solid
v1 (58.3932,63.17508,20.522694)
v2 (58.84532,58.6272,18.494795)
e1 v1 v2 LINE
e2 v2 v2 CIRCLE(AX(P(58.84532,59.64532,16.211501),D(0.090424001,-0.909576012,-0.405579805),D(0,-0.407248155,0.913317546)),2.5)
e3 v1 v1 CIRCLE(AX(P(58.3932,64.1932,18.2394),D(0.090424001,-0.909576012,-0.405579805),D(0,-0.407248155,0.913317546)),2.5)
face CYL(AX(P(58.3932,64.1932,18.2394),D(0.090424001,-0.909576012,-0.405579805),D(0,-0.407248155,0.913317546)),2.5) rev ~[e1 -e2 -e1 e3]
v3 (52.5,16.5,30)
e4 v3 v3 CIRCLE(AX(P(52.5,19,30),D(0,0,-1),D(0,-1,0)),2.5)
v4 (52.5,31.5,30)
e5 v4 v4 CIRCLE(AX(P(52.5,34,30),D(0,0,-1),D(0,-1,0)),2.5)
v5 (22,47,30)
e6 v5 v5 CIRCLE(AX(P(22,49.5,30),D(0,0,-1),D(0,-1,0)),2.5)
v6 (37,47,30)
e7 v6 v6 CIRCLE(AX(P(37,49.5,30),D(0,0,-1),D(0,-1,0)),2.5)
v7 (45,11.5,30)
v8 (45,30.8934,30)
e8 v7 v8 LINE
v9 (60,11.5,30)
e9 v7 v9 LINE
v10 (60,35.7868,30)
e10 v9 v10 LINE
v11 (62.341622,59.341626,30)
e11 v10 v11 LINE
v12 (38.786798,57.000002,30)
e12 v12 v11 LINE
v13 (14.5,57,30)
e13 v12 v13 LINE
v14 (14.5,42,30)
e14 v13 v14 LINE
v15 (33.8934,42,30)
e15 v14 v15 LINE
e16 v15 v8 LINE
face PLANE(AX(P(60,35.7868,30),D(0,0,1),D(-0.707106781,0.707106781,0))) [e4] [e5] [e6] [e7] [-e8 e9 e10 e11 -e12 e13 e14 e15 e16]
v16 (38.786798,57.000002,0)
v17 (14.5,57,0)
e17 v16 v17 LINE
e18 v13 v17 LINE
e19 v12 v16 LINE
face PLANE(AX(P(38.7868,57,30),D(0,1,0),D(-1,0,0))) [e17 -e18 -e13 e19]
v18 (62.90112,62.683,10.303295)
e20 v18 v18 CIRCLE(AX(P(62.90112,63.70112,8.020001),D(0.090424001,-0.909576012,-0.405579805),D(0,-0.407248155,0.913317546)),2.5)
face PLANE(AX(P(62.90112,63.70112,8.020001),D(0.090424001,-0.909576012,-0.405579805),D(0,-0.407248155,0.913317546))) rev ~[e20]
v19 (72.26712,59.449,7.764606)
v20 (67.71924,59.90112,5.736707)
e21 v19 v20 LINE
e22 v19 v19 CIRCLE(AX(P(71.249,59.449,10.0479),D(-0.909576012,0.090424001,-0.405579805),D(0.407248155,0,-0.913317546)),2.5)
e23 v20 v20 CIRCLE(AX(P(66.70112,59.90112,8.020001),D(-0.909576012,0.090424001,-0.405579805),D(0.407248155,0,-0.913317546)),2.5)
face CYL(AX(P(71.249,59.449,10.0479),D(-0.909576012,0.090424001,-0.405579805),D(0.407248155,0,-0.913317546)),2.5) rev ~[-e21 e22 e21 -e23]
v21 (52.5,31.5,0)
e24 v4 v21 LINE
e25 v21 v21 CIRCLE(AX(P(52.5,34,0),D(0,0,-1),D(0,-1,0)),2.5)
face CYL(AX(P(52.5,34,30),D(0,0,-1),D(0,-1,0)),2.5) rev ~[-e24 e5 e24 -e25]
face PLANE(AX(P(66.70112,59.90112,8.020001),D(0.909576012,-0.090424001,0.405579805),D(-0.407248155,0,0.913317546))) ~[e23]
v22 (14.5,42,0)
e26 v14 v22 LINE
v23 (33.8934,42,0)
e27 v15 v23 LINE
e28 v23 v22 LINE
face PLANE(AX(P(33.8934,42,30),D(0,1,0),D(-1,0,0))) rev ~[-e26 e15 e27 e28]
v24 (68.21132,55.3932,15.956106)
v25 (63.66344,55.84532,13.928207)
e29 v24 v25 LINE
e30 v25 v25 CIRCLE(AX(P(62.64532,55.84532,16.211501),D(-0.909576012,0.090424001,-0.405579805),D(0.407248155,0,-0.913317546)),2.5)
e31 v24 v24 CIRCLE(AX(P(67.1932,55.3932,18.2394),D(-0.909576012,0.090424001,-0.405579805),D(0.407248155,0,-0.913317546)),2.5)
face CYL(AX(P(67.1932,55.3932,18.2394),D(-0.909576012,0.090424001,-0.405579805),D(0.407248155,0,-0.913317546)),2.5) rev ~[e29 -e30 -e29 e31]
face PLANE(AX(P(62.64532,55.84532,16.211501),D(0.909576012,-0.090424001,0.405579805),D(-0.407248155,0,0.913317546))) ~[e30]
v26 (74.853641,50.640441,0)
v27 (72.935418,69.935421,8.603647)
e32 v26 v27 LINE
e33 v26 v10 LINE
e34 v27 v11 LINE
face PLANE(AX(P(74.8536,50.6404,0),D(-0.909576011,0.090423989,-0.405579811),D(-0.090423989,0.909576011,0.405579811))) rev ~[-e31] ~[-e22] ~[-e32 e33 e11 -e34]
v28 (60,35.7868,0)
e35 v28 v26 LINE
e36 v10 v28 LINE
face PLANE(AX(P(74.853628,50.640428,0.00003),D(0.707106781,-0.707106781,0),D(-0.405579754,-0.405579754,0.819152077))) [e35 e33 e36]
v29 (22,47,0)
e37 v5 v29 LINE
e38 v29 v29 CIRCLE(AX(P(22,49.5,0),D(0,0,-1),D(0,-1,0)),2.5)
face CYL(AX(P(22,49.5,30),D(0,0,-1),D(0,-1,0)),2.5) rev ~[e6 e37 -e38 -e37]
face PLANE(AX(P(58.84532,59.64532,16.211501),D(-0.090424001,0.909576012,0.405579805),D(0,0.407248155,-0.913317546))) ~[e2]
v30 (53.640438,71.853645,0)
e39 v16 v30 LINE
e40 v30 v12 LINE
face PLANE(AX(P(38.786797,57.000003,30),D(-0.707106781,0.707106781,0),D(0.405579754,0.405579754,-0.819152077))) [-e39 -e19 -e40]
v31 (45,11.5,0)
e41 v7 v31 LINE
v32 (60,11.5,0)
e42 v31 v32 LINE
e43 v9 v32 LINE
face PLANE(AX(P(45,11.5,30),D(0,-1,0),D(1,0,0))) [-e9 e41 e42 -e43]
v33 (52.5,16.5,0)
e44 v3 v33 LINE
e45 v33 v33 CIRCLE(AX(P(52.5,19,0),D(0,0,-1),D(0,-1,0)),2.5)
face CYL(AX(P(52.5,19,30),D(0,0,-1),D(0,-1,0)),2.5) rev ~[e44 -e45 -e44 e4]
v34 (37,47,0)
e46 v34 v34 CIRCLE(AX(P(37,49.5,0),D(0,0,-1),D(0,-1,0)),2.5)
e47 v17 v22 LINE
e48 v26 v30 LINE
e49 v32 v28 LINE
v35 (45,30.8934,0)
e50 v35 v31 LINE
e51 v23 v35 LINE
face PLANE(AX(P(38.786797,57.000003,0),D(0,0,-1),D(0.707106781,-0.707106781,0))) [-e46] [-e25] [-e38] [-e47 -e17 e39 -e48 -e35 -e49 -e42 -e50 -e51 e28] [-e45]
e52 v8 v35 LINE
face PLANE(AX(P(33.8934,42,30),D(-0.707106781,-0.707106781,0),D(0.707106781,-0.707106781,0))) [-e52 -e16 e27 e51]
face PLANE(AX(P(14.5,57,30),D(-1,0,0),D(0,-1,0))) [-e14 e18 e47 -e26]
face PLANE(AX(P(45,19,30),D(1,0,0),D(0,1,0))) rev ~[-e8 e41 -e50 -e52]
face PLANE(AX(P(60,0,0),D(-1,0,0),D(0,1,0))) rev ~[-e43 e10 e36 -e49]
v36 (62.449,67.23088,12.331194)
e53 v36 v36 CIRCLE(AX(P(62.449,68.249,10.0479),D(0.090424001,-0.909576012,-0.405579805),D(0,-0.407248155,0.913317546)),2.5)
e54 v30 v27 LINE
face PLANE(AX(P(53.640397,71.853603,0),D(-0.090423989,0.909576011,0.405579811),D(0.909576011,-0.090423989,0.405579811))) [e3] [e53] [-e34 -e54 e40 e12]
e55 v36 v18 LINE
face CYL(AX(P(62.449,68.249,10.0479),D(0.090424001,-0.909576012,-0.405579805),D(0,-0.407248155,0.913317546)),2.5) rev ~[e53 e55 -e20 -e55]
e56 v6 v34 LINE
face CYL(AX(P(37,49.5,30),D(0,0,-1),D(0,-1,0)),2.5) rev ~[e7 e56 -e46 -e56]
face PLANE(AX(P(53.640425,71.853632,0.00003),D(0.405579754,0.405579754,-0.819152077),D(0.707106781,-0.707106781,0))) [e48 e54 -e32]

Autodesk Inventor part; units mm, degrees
ref_plane "YZ Plane" through (0, 0, 0) normal (1, 0, 0) x (0, 1, 0)
ref_plane "XZ Plane" through (0, 0, 0) normal (0, 1, 0) x (-1, 0, 0)
ref_plane "XY Plane" through (0, 0, 0) normal (0, 0, 1) x (1, 0, 0)
sketch "スケッチ1" plane through (0, 0, 0) normal (0, 0, 1) x (1, 0, 0)
  line L0 (0, 0) -> (60, 0)
  line L1 (60, 0) -> (60, 60)
  line L2 (60, 60) -> (0, 60)
  line L3 (0, 60) -> (0, 0)
  dimension "d0" = 60
  dimension "d1" = 60
extrude "押し出し1" add sketch "スケッチ1" along normal blind 30
sketch "スケッチ2" plane through (0, 0, 30) normal (0, 0, 1) x (1, 0, 0)
  line L0 (60, 0) -> (60, 60) projected
  line L1 (60, 60) -> (0, 60) projected
  point P0 (0, 0)
  point P1 (22, 49.5)
  point P2 (37, 49.5)
  point P3 (52.5, 34)
  point P4 (52.5, 19)
  dimension "d4" = 7.5
  dimension "d5" = 7.5
  dimension "d6" = 10.5
  dimension "d7" = 10.5
  dimension "d8" = 15
  dimension "d9" = 15
  dimension "d10" = 23
  dimension "d11" = 26
hole "穴1" at (22, 49.5, 30) at (37, 49.5, 30) at (52.5, 34, 30) at (52.5, 19, 30) direction (0, 0, -1) diameter 5 end through all
sketch "スケッチ3" plane through (0, 0, 30) normal (0, 0, 1) x (1, 0, 0)
  line L0 (22, 49.5) -> (37, 49.5)
  circle A0 centre (52.5, 34) radius 2.5 projected
  line L1 (37, 49.5) -> (52.5, 34)
  line L2 (52.5, 34) -> (52.5, 19)
  line L3 (22, 49.5) -> (22, 19)
  line L4 (22, 19) -> (52.5, 19)
  line L5 (60, 37.1066) -> (40.1066, 57)
  line L6 (40.1066, 57) -> (14.5, 57)
  line L7 (14.5, 57) -> (14.5, 11.5)
  line L8 (14.5, 11.5) -> (60, 11.5)
  line L9 (60, 11.5) -> (60, 37.1066)
  line L10 (14.5, 57) -> (44.5, 57)
  line L11 (44.5, 57) -> (44.5, 42)
  line L12 (44.5, 42) -> (14.5, 42)
  line L13 (14.5, 42) -> (14.5, 57)
  line L14 (60, 11.5) -> (45, 11.5)
  line L15 (45, 11.5) -> (45, 41.5)
  line L16 (45, 41.5) -> (60, 41.5)
  line L17 (60, 41.5) -> (60, 11.5)
  circle A1 centre (52.5, 19) radius 2.5 projected
  circle A2 centre (52.5, 34) radius 2.5 projected
  circle A3 centre (37, 49.5) radius 2.5 projected
  circle A4 centre (22, 49.5) radius 2.5 projected
  line L18 (60, 0) -> (60, 60) projected
  line L19 (60, 60) -> (0, 60) projected
  line L20 (0, 60) -> (0, 0) projected
  line L21 (0, 0) -> (60, 0) projected
  line L22 (14.5, 42) -> (45, 11.5)
  line L23 (24.0029, 51.8905) -> (54.5029, 21.3905)
  line L24 (38.7868, 57) -> (60, 35.7868)
  point P0 (52.5, 26.5)
  point P1 (45, 19)
  point P2 (22, 42)
  point P3 (39.2529, 36.6405)
  point P4 (45, 30.8934)
  point P5 (33.8934, 42)
  dimension "d19" = 7.5
  dimension "d20" = 7.5
  dimension "d21" = 7.5
  dimension "d22" = 30
  dimension "d23" = 30
  dimension "d50" = 7.5
  dimension "d52" = 30
extrude "押し出し2" cut sketch "スケッチ3" against normal blind 30 contours L12 L23 L15 L4 L22 L3 | L3 L22 L12 | L22 L4 L3 | L3 L4 L22 L8 L7 | L7 L8 L18 L21 L20 L19 L16 L5 L11 L10 L6 | L4 L15 L22 | L24 L6 L5 L11 | L11 L5 L16 L24 | L16 L5 L9 L24 | L5 L10 L11 | L16 L17 L5
sketch "スケッチ15" plane through (60, 35.7868, 0) normal (0.7071068, 0.7071068, 0) x (-0.7071068, 0.7071068, 0)
  line L0 (0, 30) -> (30, 30) projected
  line L1 (0, 0) -> (0, 30) projected
  line L2 (30, 0) -> (0, 0) projected
  line L3 (30, 30) -> (30, 0) projected
  point P0 (17.1213, 0)
extrude "押し出し11" add sketch "スケッチ15" along normal blind 30
sketch "スケッチ16" plane through (60, 35.7868, 30) normal (0.7071068, -0.7071068, 0) x (-0.7071068, -0.7071068, 0)
  line L0 (0, 30) -> (0, 0) projected
  line L1 (0, 30) -> (-30, 30) projected
  line L2 (-30, 0) -> (-30, 30) projected
  line L3 (0, 0) -> (-30, 0) projected
  line L4 (0, 0) -> (-30.762, 43.9327)
  point P0 (67.7315, 30)
  point P1 (-21.0062, 30)
  dimension "d97" = 55
extrude "押し出し12" cut sketch "スケッチ16" against normal blind 30 contours L3 L2 L1 L4
sketch "スケッチ25" plane through (60, 35.7868, 30) normal (0.579228, 0.579228, 0.5735764) x (0.7071068, -0.7071068, 0)
  line L0 (0, 36.6232) -> (0, 0) projected
  line L1 (-30, 36.6232) -> (0, 36.6232) projected
  line L2 (-30, 0) -> (-30, 36.6232) projected
  line L3 (0, 0) -> (-30, 0) projected
  point P0 (-17.1213, -14.2746)
extrude "押し出し17" add sketch "スケッチ25" along normal blind 30
sketch "スケッチ26" plane through (74.8536, 50.6404, 0) normal (0.4055798, 0.4055798, -0.819152) x (-0.579228, -0.579228, -0.5735764)
  line L0 (0, 30) -> (0, 0) projected
  line L1 (0, 30) -> (-30, 30) projected
  line L2 (-30, 0) -> (-30, 30) projected
  line L3 (0, 0) -> (-30, 0) projected
  line L4 (0, 0) -> (-30, 30)
  line L5 (0, 30) -> (-30, 0)
  point P0 (72.6897, 17.1213)
  point P1 (-15, 15)
extrude "押し出し18" cut sketch "スケッチ26" against normal through all contours L5 L4 L1 | L3 L5 L4 | L4 L5 L2
sketch "スケッチ27" plane through (74.8536, 50.6404, 0) normal (0.909576, -0.090424, 0.4055798) x (0.4055798, 0.4055798, -0.819152)
  point P0 (-50.8979, -39.2928)
sketch "スケッチ28" plane through (0, 0, 30) normal (0, 0, 1) x (1, 0, 0)
  line L0 (3.3303, 1.5204) -> (87.3121, 1.5204)
  line L1 (87.3121, 1.5204) -> (87.3121, 89.4116)
  line L2 (87.3121, 89.4116) -> (3.3303, 89.4116)
  line L3 (3.3303, 89.4116) -> (3.3303, 1.5204)
  point P0 (0, 0)
extrude "押し出し19" cut sketch "スケッチ28" along normal blind 100
sketch "スケッチ29" plane through (74.8536, 50.6404, 0) normal (0.909576, -0.090424, 0.4055798) x (0.4055798, 0.4055798, -0.819152)
  line L0 (-36.6232, 21.2132) -> (-26.1201, 21.2132) projected
  line L1 (0, 21.2132) -> (0, 0) projected
  line L2 (-26.1201, 21.2132) -> (0, 21.2132)
  line L3 (0, 21.2132) -> (0, 0)
  line L4 (0, 0) -> (-26.1201, 0)
  line L5 (-26.1201, 0) -> (-26.1201, 21.2132)
  point P0 (-50.8979, -39.2928)
  point P1 (-16.1201, 12.4132)
  point P2 (-6.1201, 12.4132)
  dimension "d104" = 10
  dimension "d105" = 10
  dimension "d106" = 8.8
  dimension "d107" = 8.8
hole "穴4" at (67.1932, 55.3932, 18.2394) at (71.249, 59.449, 10.0479) direction (-0.909576, 0.090424, -0.4055798) diameter 5 depth 5
sketch "スケッチ30" plane through (53.6404, 71.8536, 0) normal (-0.090424, 0.909576, 0.4055798) x (0.909576, -0.090424, 0.4055798)
  line L0 (21.2132, 0) -> (21.2132, -26.1201) projected
  line L1 (-12.1674, -12.0487) -> (0, 0) projected
  line L2 (21.2132, -26.1201) -> (0, -26.1201)
  line L3 (0, -26.1201) -> (0, 0)
  line L4 (0, 0) -> (21.2132, 0)
  line L5 (21.2132, 0) -> (21.2132, -26.1201)
  point P0 (-42.2928, -50.8979)
  point P1 (12.4132, -16.1201)
  point P2 (12.4132, -6.1201)
  dimension "d115" = 10
  dimension "d116" = 10
  dimension "d117" = 8.8
  dimension "d118" = 8.8
hole "穴5" at (58.3932, 64.1932, 18.2394) at (62.449, 68.249, 10.0479) direction (0.090424, -0.909576, -0.4055798) diameter 5 depth 5
equation "\"d5\" = d4"
equation "\"d7\" = d6"
equation "\"d9\" = d8"
equation "\"d20\" = d19"
equation "\"d21\" = d20"
equation "\"d23\" = d22"
equation "\"d105\" = d104"
equation "\"d116\" = d115"
properties part number "EX-L-Connect-50deg"
